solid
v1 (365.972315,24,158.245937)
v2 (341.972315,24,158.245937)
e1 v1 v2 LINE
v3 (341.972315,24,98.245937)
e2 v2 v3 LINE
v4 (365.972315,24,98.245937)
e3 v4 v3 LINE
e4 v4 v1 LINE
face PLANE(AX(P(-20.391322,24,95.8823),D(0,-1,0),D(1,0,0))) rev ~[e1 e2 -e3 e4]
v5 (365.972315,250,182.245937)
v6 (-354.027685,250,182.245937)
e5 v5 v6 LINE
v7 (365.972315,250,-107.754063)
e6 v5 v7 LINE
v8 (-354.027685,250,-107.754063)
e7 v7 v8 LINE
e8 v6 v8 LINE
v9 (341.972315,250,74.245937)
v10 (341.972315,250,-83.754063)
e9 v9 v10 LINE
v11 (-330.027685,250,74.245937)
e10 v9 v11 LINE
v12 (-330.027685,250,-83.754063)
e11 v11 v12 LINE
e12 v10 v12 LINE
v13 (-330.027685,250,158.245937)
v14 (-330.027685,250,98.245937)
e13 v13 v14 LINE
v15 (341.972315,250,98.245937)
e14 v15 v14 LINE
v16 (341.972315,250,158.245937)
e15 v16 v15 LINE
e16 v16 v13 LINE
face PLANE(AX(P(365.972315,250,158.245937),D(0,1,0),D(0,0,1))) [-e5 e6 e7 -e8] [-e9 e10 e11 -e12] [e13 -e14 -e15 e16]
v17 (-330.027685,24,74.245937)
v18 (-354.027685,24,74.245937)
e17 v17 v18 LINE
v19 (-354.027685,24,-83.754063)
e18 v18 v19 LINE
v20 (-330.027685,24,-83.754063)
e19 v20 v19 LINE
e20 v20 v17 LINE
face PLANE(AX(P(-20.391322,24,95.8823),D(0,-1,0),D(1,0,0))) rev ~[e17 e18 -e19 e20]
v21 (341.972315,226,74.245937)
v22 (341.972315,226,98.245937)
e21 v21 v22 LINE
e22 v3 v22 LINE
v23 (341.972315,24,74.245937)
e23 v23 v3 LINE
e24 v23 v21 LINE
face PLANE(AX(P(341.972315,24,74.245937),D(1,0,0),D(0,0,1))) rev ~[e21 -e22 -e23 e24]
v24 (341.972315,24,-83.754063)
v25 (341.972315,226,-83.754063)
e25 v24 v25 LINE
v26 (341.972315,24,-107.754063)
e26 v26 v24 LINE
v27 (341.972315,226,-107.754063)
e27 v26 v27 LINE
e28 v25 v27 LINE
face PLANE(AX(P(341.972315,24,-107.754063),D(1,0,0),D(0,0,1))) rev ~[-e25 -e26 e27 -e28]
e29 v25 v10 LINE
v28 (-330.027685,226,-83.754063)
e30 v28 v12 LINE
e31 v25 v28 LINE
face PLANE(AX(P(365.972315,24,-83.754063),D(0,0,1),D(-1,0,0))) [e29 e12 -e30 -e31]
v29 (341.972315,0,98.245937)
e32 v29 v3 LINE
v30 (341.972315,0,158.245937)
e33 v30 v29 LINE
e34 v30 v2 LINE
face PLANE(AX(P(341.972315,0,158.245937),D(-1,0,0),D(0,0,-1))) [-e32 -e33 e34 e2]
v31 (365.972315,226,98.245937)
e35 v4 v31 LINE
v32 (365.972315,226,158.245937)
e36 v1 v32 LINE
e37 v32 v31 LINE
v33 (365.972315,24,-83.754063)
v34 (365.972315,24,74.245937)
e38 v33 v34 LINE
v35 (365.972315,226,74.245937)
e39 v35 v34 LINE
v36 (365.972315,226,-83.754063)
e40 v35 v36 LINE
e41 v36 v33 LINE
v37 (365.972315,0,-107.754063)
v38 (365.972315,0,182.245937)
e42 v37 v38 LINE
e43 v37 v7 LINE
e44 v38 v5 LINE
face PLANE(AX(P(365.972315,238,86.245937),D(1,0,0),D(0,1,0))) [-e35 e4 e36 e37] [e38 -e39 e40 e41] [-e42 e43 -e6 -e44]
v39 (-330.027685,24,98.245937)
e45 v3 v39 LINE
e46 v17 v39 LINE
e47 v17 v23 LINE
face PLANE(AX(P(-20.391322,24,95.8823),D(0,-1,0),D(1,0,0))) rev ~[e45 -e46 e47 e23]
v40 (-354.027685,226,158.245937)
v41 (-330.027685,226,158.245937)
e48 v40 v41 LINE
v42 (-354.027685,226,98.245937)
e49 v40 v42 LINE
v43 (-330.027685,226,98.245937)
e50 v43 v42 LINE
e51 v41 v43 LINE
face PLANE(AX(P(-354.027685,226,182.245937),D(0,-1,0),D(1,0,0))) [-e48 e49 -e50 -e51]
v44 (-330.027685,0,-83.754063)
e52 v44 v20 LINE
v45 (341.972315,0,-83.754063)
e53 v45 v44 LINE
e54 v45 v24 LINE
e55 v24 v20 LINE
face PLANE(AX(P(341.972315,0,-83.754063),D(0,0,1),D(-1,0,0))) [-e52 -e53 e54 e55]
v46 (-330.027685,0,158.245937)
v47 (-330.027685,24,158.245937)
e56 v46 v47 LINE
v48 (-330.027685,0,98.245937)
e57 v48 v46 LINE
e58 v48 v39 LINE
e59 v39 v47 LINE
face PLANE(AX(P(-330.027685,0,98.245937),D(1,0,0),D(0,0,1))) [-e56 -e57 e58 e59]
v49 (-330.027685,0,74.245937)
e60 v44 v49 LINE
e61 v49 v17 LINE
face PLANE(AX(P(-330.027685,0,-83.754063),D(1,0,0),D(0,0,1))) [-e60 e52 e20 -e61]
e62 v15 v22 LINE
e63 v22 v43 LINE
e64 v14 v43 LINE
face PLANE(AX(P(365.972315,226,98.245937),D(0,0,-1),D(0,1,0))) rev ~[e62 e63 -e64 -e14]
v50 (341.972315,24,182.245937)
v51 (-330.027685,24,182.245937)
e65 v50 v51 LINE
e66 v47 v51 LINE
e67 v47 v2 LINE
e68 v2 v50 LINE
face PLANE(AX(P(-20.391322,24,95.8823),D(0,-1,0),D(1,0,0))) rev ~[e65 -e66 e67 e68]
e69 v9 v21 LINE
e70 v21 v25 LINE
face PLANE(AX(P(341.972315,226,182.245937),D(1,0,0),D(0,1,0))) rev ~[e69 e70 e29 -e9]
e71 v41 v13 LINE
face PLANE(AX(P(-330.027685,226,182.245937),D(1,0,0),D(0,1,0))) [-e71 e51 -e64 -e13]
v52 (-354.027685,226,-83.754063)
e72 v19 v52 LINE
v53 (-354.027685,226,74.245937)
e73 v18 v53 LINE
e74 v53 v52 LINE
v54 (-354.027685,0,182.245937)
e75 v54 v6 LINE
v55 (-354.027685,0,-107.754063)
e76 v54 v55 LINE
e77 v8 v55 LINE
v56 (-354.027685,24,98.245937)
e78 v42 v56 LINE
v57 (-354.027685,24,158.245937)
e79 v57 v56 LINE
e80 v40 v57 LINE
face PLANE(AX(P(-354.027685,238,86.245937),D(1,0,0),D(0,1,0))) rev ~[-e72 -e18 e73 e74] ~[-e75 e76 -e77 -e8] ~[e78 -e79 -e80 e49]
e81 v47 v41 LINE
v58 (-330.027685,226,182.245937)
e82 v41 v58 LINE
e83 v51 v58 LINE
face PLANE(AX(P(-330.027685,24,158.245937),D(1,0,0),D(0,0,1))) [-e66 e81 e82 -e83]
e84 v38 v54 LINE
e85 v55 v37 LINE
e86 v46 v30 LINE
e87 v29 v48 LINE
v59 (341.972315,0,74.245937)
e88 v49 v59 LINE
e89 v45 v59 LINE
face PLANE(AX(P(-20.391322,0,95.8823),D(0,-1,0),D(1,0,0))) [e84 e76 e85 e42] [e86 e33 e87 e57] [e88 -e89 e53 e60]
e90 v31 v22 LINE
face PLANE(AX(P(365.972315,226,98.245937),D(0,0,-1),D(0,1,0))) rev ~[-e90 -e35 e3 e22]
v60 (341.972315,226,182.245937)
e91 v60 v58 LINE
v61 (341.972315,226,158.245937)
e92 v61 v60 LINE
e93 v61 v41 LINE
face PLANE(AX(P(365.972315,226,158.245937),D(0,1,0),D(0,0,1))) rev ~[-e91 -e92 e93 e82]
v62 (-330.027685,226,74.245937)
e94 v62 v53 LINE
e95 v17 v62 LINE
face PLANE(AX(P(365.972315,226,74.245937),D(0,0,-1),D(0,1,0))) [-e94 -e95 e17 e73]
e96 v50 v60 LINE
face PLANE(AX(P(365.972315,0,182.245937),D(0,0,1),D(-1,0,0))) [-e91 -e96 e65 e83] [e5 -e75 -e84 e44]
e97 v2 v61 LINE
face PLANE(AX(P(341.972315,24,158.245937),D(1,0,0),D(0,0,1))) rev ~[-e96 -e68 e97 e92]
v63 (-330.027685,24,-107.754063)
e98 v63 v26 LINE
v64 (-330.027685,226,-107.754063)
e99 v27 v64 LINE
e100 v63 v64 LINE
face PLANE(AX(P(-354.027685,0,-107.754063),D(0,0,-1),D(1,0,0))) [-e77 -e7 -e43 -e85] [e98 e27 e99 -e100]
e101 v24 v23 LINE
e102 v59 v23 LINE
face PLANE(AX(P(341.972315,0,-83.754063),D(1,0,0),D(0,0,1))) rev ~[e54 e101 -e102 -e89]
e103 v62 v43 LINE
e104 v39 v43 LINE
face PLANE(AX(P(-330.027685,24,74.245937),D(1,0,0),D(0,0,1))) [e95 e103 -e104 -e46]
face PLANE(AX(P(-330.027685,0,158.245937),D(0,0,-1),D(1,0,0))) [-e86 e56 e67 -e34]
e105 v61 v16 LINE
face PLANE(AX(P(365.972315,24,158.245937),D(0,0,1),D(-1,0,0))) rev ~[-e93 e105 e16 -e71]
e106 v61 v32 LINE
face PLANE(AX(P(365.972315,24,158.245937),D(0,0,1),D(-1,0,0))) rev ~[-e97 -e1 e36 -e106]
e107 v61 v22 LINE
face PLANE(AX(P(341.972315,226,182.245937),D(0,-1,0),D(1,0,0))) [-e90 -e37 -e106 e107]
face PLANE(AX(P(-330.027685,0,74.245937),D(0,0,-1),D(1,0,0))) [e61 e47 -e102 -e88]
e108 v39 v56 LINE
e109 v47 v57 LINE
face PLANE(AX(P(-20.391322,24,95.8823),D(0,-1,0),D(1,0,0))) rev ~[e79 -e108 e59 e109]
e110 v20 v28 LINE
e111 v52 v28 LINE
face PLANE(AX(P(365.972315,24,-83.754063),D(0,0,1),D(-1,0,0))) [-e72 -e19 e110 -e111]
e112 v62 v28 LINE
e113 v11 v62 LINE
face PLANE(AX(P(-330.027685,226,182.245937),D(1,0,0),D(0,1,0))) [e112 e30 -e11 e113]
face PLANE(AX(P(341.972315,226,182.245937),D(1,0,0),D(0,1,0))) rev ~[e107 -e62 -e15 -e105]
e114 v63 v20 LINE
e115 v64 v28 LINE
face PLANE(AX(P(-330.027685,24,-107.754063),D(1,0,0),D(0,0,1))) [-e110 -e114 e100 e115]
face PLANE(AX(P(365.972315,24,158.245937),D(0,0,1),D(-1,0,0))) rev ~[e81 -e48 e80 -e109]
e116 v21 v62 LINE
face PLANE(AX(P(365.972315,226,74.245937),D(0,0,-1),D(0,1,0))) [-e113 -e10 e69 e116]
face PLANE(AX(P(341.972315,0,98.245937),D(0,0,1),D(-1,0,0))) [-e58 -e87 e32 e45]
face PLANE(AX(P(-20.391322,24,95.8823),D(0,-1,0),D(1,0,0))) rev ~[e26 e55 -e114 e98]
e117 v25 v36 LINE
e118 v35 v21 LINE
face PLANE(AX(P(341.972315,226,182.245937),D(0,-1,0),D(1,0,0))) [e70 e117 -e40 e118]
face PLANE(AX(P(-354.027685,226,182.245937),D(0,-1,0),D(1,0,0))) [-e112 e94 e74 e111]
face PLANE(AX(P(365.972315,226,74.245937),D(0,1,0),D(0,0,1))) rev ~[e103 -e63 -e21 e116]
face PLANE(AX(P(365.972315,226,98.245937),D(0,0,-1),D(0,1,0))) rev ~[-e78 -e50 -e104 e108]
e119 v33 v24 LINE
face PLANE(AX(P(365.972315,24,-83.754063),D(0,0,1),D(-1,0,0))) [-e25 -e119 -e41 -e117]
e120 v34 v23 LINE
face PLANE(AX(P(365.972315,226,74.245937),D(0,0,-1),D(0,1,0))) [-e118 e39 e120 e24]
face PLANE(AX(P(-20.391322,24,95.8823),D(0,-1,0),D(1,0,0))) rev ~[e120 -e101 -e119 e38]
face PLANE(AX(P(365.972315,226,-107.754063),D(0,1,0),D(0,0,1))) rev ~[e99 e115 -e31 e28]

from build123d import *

# Parameters (mm, degrees)
F0_W     = 24
F0_H     = 158
F1_DEPTH = 24
F2_W     = 24
F2_H     = 24
F3_DEPTH = 202
F4_W     = 24
F4_H     = 24
F5_DEPTH = 720
F6_W     = 24
F6_H     = 24
F7_DEPTH = 280


with BuildPart() as f1:
    # F0 (on Front) → F1 (new body)
    with BuildSketch(Plane.XZ):
        Polygon((-330.027685374, 158.2459368452), (-354.027685374, 158.2459368452), (-354.027685374, 110.2459368452), (-354.027685374, 86.2459368452), (365.972314626, 86.2459368452), (365.972314626, 98.2459368452), (341.972314626, 98.2459368452), (-330.027685374, 98.2459368452), align=None)
        Polygon((365.972314626, 110.2459368452), (365.972314626, 158.2459368452), (341.972314626, 158.2459368452), (341.972314626, 98.2459368452), (365.972314626, 98.2459368452), align=None)
        Polygon((-330.027685374, 74.2459368452), (-354.027685374, 74.2459368452), (-354.027685374, 62.2459368452), (-354.027685374, -83.7540631548), (-330.027685374, -83.7540631548), align=None)
        with Locations((353.972314626, -4.7540631548)):
            Rectangle(F0_W, F0_H)
        Polygon((365.972314626, 86.2459368452), (-354.027685374, 86.2459368452), (-354.027685374, 74.2459368452), (-330.027685374, 74.2459368452), (341.972314626, 74.2459368452), (365.972314626, 74.2459368452), align=None)
        Polygon((365.972314626, 182.2459368452), (-354.027685374, 182.2459368452), (-354.027685374, 158.2459368452), (-330.027685374, 158.2459368452), (341.972314626, 158.2459368452), (365.972314626, 158.2459368452), align=None)
        Polygon((-330.027685374, -83.7540631548), (-354.027685374, -83.7540631548), (-354.027685374, -107.7540631548), (365.972314626, -107.7540631548), (365.972314626, -83.7540631548), (341.972314626, -83.7540631548), align=None)
    extrude(amount=-F1_DEPTH)

    # F2 (on face) → F3 (join)
    with BuildSketch(Plane(origin=(0, 24, 0), x_dir=(-1, 0, 0), z_dir=(0, 1, 0))):
        with Locations((-353.972314626, 86.2459368452)):
            Rectangle(F2_W, F2_H)
        with Locations((-353.972314626, -95.7540631548)):
            Rectangle(F2_W, F2_H)
        with Locations((342.027685374, 170.2459368452)):
            Rectangle(F2_W, F2_H)
        with Locations((342.027685374, -95.7540631548)):
            Rectangle(F2_W, F2_H)
        with Locations((342.027685374, 86.2459368452)):
            Rectangle(F2_W, F2_H)
        with Locations((-353.972314626, 170.2459368452)):
            Rectangle(F2_W, F2_H)
    extrude(amount=F3_DEPTH)

    # F4 (on face) → F5 (join)
    with BuildSketch(Plane.YZ.offset(365.972314626)):
        with Locations((238, 86.2459368452)):
            Rectangle(F4_W, F4_H)
        with Locations((238, 170.2459368452)):
            Rectangle(F4_W, F4_H)
        with Locations((238, -95.7540631548)):
            Rectangle(F4_W, F4_H)
    extrude(amount=-F5_DEPTH)

    # F6 (on face) → F7 (join)
    with BuildSketch(Plane.XY.offset(182.2459368452)):
        with Locations((-342.027685374, 238)):
            Rectangle(F6_W, F6_H)
        with Locations((353.972314626, 238)):
            Rectangle(F6_W, F6_H)
    extrude(amount=-F7_DEPTH)


solid = f1.part
